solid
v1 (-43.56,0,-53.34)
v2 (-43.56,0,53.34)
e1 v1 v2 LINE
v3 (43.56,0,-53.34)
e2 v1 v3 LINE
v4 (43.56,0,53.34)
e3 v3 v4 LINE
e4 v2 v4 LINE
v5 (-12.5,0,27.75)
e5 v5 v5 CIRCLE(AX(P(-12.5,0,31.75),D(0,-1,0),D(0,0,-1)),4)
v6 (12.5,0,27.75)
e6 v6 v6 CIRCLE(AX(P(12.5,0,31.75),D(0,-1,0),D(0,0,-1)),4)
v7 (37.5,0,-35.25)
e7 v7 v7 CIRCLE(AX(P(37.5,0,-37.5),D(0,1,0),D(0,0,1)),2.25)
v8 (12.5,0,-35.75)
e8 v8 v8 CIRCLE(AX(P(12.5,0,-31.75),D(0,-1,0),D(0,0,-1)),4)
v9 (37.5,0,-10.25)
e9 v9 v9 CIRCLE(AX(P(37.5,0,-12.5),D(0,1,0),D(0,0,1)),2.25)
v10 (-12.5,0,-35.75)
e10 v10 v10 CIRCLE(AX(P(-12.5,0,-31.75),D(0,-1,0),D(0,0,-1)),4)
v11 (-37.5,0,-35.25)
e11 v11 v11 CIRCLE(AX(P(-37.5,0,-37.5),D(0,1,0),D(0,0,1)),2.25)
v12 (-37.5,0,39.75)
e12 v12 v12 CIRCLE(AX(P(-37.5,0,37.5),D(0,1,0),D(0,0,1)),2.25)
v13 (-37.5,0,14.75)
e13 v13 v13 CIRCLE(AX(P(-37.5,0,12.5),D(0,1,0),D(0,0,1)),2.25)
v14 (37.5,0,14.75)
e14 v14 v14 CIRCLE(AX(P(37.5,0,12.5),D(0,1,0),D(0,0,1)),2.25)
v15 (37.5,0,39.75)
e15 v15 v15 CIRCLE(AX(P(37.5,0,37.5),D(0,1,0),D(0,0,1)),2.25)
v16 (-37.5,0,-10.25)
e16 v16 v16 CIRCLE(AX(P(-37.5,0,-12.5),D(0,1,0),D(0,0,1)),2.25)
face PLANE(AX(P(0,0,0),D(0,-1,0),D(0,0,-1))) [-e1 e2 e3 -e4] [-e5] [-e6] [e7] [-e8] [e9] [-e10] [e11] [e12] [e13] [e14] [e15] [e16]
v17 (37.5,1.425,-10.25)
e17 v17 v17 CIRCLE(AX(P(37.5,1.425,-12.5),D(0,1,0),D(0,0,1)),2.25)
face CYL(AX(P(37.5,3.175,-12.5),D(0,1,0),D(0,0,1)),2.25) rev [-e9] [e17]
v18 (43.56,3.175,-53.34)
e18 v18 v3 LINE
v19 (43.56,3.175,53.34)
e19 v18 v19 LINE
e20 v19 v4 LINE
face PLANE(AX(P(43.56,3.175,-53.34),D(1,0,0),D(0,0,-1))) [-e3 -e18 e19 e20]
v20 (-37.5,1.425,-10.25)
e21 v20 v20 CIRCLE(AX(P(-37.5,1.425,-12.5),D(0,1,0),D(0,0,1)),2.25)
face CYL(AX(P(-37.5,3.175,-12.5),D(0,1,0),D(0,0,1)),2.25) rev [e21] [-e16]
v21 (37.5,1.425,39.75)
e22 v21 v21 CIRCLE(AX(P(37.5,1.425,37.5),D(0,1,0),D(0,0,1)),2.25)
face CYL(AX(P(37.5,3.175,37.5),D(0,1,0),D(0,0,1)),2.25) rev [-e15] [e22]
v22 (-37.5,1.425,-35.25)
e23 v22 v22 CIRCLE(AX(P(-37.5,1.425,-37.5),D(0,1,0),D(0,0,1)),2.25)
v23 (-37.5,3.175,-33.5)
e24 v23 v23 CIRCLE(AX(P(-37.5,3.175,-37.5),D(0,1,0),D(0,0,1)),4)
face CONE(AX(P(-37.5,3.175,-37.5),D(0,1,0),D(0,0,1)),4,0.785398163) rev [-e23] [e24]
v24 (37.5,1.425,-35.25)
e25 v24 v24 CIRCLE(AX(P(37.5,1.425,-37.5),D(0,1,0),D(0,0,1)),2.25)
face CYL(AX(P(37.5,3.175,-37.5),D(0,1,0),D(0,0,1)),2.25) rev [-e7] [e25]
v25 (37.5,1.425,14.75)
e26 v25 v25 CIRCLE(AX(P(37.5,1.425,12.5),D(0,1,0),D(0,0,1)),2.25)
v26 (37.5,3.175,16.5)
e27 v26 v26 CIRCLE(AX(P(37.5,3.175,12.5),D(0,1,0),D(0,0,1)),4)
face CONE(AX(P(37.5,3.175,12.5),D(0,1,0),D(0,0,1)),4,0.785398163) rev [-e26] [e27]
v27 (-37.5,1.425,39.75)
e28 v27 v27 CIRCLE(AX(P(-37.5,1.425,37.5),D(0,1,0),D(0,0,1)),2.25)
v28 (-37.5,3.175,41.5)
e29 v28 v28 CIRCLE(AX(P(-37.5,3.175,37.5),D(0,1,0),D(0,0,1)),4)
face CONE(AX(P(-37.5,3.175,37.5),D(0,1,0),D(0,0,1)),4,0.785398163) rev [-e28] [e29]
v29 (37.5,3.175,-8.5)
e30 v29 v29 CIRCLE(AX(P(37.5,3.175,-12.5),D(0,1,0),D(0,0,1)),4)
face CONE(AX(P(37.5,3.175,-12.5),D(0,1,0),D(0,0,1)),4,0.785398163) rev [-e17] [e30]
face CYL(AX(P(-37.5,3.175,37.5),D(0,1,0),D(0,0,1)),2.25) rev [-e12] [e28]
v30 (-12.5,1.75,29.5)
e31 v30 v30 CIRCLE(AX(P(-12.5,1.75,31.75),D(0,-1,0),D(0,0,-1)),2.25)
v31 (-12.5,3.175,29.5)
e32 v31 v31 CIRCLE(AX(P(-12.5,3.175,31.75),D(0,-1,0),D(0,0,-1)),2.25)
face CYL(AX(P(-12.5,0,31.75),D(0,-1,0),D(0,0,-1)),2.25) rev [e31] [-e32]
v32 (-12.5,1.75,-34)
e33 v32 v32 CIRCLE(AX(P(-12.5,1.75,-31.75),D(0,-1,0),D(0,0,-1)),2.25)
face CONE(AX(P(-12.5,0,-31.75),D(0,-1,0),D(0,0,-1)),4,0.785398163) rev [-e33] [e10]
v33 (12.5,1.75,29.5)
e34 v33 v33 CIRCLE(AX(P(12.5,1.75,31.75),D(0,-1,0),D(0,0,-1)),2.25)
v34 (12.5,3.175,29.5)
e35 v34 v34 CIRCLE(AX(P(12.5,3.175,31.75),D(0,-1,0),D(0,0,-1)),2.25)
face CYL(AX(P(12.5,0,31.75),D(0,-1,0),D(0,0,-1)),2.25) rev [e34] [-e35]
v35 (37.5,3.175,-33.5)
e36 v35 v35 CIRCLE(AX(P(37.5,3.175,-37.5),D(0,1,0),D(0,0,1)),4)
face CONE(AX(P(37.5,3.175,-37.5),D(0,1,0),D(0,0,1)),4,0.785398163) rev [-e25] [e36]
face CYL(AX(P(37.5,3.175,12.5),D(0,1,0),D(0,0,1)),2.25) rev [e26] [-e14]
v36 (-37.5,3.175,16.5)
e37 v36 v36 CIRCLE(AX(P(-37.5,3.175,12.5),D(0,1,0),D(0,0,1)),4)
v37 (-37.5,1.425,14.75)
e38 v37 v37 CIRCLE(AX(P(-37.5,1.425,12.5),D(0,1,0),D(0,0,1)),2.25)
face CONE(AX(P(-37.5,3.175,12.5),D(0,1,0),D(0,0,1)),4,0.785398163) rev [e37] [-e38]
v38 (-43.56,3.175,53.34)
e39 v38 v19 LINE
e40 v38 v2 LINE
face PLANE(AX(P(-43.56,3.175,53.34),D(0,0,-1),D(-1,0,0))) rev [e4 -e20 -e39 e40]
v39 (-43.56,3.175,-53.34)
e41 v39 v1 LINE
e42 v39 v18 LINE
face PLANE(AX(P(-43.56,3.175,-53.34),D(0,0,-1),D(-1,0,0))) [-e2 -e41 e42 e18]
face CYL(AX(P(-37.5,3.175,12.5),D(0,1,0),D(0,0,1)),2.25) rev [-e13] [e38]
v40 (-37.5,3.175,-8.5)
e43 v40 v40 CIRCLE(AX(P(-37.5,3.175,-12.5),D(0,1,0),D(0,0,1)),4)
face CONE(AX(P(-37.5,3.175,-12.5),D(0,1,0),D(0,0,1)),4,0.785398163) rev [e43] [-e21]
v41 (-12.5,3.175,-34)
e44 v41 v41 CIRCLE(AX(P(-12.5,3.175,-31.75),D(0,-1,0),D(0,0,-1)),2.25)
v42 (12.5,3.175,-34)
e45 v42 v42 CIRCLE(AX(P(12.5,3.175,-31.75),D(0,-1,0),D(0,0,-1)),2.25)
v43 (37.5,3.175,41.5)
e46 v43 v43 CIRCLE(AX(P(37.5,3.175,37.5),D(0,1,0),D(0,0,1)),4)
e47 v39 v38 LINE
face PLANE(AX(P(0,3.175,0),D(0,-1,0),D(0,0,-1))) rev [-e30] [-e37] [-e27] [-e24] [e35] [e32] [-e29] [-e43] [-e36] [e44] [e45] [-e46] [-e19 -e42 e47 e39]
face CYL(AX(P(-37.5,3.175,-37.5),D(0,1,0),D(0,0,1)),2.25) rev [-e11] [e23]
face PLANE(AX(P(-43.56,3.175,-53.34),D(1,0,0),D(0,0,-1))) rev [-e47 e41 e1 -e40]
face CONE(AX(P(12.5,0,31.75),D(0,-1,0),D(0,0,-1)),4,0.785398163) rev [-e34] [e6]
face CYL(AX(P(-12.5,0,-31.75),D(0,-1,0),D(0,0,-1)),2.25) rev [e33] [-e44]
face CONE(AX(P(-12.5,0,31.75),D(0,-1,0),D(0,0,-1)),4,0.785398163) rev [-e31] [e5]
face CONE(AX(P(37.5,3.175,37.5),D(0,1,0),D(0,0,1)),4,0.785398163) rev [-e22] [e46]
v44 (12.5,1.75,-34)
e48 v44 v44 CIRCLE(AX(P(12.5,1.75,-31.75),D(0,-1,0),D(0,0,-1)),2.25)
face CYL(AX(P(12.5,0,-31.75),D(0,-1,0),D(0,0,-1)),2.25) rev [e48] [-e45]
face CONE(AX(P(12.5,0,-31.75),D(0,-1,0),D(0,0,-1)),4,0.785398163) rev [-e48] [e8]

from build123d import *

# Parameters (mm, degrees)
SKETCH2_W                    = 87.12
SKETCH2_H                    = 106.68
BOSS_EXTRUDE1_DEPTH          = 3.175
CSK_FOR_M4_SFHCS1_AT_2_COUNT = 2
CSK_FOR_M4_SFHCS1_AT_2_PITCH = 25


# Read off the part's stored shape, not the designer's step: AdvancedHole2
with BuildPart() as part:
    # Sketch2 → Boss-Extrude1 (new body)
    with BuildSketch(Plane(origin=(0, 0, 0), x_dir=(1, 0, 0), z_dir=(0, 1, 0))):
        Rectangle(SKETCH2_W, SKETCH2_H)
    extrude(amount=BOSS_EXTRUDE1_DEPTH)

    # AdvancedHole2 outline → AdvancedHole2 (revolve, cut)
    with BuildSketch(Plane(origin=(-37.5, 0, 12.5), x_dir=(1, 0, 0), z_dir=(0, 0, 1))):
        Polygon((4, 3.175), (0, 3.175), (0, 0), (2.25, 0), (2.25, 1.425), align=None)
    revolve(axis=Axis((-37.5, 0, 12.5), (0, 1, 0)), mode=Mode.SUBTRACT)

    # AdvancedHole2 2 outline → AdvancedHole2 2 (revolve, cut)
    with BuildSketch(Plane(origin=(-37.5, 0, 37.5), x_dir=(1, 0, 0), z_dir=(0, 0, 1))):
        Polygon((4, 3.175), (0, 3.175), (0, 0), (2.25, 0), (2.25, 1.425), align=None)
    revolve(axis=Axis((-37.5, 0, 37.5), (0, 1, 0)), mode=Mode.SUBTRACT)

    # AdvancedHole2 3 outline → AdvancedHole2 3 (revolve, cut)
    with BuildSketch(Plane(origin=(37.5, 0, 37.5), x_dir=(1, 0, 0), z_dir=(0, 0, 1))):
        Polygon((4, 3.175), (0, 3.175), (0, 0), (2.25, 0), (2.25, 1.425), align=None)
    revolve(axis=Axis((37.5, 0, 37.5), (0, 1, 0)), mode=Mode.SUBTRACT)

    # AdvancedHole2 4 outline → AdvancedHole2 4 (revolve, cut)
    with BuildSketch(Plane(origin=(37.5, 0, 12.5), x_dir=(1, 0, 0), z_dir=(0, 0, 1))):
        Polygon((4, 3.175), (0, 3.175), (0, 0), (2.25, 0), (2.25, 1.425), align=None)
    revolve(axis=Axis((37.5, 0, 12.5), (0, 1, 0)), mode=Mode.SUBTRACT)

    # AdvancedHole2 5 outline → AdvancedHole2 5 (revolve, cut)
    with BuildSketch(Plane(origin=(37.5, 0, -12.5), x_dir=(1, 0, 0), z_dir=(0, 0, 1))):
        Polygon((4, 3.175), (0, 3.175), (0, 0), (2.25, 0), (2.25, 1.425), align=None)
    revolve(axis=Axis((37.5, 0, -12.5), (0, 1, 0)), mode=Mode.SUBTRACT)

    # AdvancedHole2 6 outline → AdvancedHole2 6 (revolve, cut)
    with BuildSketch(Plane(origin=(37.5, 0, -37.5), x_dir=(1, 0, 0), z_dir=(0, 0, 1))):
        Polygon((4, 3.175), (0, 3.175), (0, 0), (2.25, 0), (2.25, 1.425), align=None)
    revolve(axis=Axis((37.5, 0, -37.5), (0, 1, 0)), mode=Mode.SUBTRACT)

    # AdvancedHole2 7 outline → AdvancedHole2 7 (revolve, cut)
    with BuildSketch(Plane(origin=(-37.5, 0, -12.5), x_dir=(1, 0, 0), z_dir=(0, 0, 1))):
        Polygon((4, 3.175), (0, 3.175), (0, 0), (2.25, 0), (2.25, 1.425), align=None)
    revolve(axis=Axis((-37.5, 0, -12.5), (0, 1, 0)), mode=Mode.SUBTRACT)

    # AdvancedHole2 8 outline → AdvancedHole2 8 (revolve, cut)
    with BuildSketch(Plane(origin=(-37.5, 0, -37.5), x_dir=(1, 0, 0), z_dir=(0, 0, 1))):
        Polygon((4, 3.175), (0, 3.175), (0, 0), (2.25, 0), (2.25, 1.425), align=None)
    revolve(axis=Axis((-37.5, 0, -37.5), (0, 1, 0)), mode=Mode.SUBTRACT)

    # Sketch21 → CSK for M4 SFHCS1 (revolve, cut)
    with BuildSketch(Plane(origin=(12.5, 0, -31.75), x_dir=(0, 0, -1), z_dir=(1, 0, 0))):
        Polygon((0, 0), (0, 11.351936393), (2.25, 10), (2.25, 1.75), (4, 0), align=None)
    csk_for_m4_sfhcs1 = revolve(axis=Axis((12.5, -6.35, -31.75), (0, 1, 0)), mode=Mode.SUBTRACT)

    # CSK for M4 SFHCS1 at 2: CSK for M4 SFHCS1 ×2
    with Locations(*[(-i * CSK_FOR_M4_SFHCS1_AT_2_PITCH, 0, 0) for i in range(1, CSK_FOR_M4_SFHCS1_AT_2_COUNT)]):
        add(csk_for_m4_sfhcs1, mode=Mode.SUBTRACT)

    # Mirror1: CSK for M4 SFHCS1 across plane
    add(csk_for_m4_sfhcs1.mirror(Plane.XY), mode=Mode.SUBTRACT)

    # Mirror1 copy 1 sketch → Mirror1 copy 1 (revolve, cut)
    with BuildSketch(Plane(origin=(-12.5, 0, 31.75), x_dir=(0, 0, 1), z_dir=(1, 0, 0))):
        Polygon((0, 0), (0, -11.351936393), (2.25, -10), (2.25, -1.75), (4, 0), align=None)
    revolve(axis=Axis((-12.5, -6.35, 31.75), (0, -1, 0)), mode=Mode.SUBTRACT)


solid = part.part
